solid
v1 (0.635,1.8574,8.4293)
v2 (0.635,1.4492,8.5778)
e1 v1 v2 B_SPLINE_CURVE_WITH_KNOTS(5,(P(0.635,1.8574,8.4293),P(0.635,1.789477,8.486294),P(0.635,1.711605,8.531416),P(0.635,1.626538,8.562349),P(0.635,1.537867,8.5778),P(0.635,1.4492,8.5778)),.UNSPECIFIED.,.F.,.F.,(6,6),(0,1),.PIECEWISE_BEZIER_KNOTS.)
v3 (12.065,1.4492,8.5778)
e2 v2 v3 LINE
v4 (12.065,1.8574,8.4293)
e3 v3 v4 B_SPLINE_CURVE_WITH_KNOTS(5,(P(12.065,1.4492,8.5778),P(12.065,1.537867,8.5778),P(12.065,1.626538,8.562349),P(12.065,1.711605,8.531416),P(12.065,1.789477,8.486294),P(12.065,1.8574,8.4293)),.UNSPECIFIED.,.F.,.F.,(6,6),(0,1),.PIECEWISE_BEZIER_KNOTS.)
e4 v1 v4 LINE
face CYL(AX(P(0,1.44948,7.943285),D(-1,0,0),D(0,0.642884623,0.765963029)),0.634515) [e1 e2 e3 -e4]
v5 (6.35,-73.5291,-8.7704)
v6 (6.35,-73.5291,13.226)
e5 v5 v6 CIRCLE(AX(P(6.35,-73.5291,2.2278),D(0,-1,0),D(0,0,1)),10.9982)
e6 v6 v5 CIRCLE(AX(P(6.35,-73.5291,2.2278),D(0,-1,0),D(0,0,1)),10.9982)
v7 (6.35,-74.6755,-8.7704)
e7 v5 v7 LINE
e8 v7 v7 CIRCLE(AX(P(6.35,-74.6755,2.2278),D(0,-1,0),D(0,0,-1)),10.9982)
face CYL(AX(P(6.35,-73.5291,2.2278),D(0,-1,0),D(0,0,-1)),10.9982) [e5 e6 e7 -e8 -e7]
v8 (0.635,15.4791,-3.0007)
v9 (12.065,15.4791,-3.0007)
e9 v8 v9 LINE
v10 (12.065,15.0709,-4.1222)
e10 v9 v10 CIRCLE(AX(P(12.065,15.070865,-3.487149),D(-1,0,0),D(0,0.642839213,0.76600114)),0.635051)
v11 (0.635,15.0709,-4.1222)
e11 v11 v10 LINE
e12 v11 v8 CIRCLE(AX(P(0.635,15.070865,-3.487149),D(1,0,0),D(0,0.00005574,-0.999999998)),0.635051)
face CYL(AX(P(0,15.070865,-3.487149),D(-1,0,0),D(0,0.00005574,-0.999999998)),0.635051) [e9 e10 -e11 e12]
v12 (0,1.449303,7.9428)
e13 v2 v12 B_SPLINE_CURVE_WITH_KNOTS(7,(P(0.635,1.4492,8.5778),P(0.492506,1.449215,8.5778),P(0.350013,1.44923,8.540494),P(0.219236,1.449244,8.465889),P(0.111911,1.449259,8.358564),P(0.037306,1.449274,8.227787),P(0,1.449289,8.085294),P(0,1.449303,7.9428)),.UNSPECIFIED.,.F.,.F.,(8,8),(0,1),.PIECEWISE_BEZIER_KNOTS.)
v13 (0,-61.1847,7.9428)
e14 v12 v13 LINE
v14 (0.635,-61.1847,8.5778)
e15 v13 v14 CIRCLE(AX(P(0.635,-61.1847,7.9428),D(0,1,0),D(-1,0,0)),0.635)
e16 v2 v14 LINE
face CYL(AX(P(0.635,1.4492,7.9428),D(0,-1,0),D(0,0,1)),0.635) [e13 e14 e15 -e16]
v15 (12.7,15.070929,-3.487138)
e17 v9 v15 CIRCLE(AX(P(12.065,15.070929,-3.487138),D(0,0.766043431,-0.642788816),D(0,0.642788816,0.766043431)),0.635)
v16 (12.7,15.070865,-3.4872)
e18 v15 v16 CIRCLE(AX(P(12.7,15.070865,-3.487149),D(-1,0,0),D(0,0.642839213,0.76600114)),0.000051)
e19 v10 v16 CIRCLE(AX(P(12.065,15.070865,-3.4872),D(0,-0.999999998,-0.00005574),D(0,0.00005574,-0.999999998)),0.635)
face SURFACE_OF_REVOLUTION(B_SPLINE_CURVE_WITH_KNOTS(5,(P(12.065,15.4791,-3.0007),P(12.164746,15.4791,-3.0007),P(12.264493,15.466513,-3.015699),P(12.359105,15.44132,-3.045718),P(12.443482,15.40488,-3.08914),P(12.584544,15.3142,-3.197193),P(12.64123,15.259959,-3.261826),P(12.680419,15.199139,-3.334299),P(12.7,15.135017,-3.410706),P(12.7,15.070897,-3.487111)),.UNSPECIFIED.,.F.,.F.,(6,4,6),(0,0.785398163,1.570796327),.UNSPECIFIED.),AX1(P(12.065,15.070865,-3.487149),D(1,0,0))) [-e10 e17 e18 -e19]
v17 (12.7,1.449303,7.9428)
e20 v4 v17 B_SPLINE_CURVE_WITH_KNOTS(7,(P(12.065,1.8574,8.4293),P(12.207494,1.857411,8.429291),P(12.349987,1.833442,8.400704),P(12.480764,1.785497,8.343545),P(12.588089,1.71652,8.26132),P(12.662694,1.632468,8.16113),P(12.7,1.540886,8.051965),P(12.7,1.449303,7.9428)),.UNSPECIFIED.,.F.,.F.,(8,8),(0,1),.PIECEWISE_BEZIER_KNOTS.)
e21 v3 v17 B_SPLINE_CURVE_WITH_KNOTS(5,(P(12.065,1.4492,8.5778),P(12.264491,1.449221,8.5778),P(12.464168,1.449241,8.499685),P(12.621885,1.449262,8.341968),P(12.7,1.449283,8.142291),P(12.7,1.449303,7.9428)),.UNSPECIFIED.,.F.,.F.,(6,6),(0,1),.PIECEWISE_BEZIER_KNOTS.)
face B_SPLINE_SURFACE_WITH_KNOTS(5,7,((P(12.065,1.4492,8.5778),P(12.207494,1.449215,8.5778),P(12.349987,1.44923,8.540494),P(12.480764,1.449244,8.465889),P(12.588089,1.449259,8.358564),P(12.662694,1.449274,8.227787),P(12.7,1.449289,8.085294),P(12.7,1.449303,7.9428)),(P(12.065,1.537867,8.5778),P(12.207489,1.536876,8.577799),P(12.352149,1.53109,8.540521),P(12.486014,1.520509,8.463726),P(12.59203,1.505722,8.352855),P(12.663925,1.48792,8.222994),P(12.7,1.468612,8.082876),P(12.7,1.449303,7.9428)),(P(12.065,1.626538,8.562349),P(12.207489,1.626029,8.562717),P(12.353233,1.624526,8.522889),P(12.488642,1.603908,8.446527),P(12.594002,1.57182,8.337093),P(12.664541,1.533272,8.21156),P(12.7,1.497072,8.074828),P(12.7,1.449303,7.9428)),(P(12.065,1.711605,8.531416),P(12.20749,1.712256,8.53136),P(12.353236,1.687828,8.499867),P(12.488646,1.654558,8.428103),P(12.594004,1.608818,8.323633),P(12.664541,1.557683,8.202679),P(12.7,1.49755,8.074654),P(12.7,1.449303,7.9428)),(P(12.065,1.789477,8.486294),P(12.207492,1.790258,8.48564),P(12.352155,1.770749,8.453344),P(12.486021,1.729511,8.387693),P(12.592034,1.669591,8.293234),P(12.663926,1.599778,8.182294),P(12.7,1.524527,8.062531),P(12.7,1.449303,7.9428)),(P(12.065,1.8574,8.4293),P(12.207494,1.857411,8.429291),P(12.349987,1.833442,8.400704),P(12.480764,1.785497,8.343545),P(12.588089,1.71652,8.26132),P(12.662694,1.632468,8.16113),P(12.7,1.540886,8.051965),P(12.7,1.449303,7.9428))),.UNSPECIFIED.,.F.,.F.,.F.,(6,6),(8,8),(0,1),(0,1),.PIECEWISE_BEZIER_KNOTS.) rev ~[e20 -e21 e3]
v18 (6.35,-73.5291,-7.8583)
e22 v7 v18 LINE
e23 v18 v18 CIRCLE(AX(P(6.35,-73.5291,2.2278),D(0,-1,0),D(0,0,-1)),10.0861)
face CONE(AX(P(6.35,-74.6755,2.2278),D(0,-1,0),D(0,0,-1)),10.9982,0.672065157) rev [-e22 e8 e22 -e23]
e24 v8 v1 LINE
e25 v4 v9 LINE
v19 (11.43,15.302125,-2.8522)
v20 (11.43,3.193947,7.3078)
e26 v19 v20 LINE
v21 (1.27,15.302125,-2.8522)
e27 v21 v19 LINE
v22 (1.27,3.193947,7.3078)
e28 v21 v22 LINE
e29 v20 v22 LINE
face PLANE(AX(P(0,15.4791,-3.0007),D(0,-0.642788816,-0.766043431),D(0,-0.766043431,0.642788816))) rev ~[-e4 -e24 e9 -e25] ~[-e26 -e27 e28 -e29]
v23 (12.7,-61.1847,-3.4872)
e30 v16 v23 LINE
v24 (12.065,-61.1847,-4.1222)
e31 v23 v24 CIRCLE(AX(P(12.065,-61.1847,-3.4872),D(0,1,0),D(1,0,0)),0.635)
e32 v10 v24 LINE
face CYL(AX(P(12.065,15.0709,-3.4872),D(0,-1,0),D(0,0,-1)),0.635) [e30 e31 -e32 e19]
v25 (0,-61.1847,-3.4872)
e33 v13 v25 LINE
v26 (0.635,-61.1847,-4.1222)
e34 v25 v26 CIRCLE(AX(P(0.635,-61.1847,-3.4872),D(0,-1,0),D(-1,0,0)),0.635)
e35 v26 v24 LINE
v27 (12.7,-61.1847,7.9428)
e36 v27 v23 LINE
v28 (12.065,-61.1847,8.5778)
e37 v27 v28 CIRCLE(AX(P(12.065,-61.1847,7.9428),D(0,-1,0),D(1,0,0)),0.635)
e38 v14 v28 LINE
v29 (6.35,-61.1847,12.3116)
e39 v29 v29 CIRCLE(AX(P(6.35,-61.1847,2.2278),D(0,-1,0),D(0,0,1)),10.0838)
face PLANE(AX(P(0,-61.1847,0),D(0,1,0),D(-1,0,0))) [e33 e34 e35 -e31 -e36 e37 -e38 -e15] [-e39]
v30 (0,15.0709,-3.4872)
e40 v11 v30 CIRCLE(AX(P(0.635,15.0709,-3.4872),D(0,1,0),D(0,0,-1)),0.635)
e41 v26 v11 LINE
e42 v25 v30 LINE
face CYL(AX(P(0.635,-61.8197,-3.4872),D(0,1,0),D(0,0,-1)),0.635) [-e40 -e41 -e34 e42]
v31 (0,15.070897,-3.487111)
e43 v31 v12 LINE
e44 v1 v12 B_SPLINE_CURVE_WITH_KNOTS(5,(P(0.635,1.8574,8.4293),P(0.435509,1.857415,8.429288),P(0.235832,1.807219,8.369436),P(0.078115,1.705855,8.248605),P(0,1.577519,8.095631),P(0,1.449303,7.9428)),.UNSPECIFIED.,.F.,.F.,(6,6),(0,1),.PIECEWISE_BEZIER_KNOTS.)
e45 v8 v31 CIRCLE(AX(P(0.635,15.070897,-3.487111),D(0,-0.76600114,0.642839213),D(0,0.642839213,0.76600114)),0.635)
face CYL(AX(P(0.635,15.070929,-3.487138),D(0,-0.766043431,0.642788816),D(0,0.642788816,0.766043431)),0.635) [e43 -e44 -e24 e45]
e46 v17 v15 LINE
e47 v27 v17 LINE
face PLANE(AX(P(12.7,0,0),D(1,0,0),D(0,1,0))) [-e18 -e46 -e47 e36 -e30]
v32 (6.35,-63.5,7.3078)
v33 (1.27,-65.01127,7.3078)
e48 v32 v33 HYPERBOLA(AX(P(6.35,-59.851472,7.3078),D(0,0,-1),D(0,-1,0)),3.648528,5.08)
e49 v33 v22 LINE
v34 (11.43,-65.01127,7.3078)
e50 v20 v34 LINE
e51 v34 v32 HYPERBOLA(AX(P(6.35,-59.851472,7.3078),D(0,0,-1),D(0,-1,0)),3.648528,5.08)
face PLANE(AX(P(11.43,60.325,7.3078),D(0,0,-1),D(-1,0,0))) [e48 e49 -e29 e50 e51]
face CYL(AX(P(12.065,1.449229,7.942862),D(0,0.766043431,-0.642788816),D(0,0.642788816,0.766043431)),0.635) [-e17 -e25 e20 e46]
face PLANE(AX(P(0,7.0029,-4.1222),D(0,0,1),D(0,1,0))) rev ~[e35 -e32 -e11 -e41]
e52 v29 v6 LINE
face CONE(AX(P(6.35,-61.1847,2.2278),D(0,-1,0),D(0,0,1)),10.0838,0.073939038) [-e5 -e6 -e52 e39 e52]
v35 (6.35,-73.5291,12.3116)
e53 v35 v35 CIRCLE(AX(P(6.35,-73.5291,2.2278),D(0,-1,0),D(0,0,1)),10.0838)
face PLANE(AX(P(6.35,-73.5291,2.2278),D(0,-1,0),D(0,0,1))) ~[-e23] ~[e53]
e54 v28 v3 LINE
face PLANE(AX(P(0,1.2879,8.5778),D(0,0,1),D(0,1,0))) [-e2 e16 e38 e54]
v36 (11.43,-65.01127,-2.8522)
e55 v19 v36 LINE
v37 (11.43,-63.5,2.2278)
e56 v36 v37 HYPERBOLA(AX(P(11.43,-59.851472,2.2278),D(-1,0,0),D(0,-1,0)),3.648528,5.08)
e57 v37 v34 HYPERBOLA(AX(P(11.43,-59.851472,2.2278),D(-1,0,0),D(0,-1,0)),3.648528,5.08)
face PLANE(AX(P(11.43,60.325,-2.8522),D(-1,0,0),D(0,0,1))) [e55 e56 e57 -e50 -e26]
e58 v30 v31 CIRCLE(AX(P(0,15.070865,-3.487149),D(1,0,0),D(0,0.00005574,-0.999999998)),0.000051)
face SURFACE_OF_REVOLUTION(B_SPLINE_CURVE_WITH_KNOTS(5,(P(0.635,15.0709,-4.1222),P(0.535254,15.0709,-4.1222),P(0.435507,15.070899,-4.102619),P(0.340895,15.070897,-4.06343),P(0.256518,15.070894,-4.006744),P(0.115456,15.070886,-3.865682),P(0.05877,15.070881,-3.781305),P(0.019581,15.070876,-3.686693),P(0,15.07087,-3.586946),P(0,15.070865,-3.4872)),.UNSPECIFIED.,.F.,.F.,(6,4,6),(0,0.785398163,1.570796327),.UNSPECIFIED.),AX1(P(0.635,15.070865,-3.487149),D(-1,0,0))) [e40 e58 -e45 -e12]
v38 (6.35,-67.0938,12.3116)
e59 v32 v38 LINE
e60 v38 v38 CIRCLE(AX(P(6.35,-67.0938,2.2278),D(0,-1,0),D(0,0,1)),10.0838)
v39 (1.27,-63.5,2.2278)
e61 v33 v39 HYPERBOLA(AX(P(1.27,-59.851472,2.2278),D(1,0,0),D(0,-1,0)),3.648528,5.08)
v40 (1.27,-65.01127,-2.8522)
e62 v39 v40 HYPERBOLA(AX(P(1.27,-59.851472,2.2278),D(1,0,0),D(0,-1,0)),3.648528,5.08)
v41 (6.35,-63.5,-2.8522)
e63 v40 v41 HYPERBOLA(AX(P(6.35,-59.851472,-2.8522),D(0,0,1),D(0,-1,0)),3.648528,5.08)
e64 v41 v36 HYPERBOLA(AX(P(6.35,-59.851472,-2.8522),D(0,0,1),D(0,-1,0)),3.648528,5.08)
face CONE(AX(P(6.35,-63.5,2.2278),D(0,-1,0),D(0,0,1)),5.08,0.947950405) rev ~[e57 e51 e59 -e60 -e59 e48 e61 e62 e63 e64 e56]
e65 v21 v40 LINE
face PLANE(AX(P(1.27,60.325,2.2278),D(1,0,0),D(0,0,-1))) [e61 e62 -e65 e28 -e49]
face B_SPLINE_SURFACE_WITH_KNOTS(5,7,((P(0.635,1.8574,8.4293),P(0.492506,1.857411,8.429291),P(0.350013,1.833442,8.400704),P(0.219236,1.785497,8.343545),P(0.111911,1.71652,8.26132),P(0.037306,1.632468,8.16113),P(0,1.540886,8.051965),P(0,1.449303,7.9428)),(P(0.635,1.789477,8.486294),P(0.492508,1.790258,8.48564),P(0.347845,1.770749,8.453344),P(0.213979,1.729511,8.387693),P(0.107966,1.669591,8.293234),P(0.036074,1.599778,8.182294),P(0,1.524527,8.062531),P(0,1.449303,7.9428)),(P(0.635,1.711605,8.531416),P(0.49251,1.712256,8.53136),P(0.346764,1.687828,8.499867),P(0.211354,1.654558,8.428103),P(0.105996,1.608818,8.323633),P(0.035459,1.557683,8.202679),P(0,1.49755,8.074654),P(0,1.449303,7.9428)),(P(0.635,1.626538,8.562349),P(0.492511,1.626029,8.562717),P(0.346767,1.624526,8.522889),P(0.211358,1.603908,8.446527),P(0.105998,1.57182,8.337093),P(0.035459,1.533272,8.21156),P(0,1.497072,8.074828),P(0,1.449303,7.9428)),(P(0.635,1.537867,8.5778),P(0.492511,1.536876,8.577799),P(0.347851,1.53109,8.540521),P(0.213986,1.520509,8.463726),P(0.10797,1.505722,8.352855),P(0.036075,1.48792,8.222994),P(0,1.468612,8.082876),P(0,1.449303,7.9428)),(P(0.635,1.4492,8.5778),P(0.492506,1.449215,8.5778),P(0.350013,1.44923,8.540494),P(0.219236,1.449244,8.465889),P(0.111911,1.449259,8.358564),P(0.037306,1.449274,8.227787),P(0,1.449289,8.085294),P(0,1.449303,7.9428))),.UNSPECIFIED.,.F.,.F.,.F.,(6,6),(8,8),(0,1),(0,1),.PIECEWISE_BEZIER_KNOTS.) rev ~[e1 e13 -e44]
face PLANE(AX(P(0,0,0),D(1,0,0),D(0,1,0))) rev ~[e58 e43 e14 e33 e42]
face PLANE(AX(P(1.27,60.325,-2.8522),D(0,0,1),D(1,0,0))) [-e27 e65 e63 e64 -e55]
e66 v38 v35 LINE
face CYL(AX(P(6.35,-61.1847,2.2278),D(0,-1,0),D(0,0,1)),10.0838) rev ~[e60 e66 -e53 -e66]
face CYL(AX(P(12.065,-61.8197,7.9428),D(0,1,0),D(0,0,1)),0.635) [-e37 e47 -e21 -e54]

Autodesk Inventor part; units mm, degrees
sketch "Sketch1" plane through (0, 0, 0) normal (1, 0, 0) x (0, 1, 0)
  line L0 (1.2879, 8.5778) -> (-61.8197, 8.5778)
  line L1 (-61.8197, 8.5778) -> (-61.8197, -4.1222)
  line L2 (-61.8197, -4.1222) -> (1.6803, -4.1222)
  line L3 (1.6803, -4.1222) -> (7.0029, -4.1222)
  line L4 (1.2879, 8.5778) -> (1.4492, 8.5778)
  line L5 (7.0029, -4.1222) -> (15.0709, -4.1222)
  line L6 (15.4791, -3.0007) -> (1.8574, 8.4293)
  arc A0 (1.8574, 8.4293) -> (1.4492, 8.5778) centre (1.4492, 7.9428) ccw
  arc A1 (15.0709, -4.1222) -> (15.4791, -3.0007) centre (15.0709, -3.4872) ccw
  point P0 (0, 0)
  point P1 (1.6803, 8.5778)
  point P2 (8.0303, -4.1222)
  dimension "d0" = 63.5
  dimension "d1" = 12.7
  dimension "d2" = 63.5
  dimension "d3" = 6.35
  dimension "d17" = 0.635
extrude "Extrusion1" add sketch "Sketch1" along normal blind 12.7
sketch "Sketch2" plane through (0, -61.8197, -4.1222) normal (0, -1, 0) x (1, 0, 0)
  line L0 (12.7, 12.349) -> (12.7, 12.7) projected
  line L1 (0, 12.7) -> (0, 0) projected
  line L2 (12.7, 12.7) -> (0, 12.7)
  line L3 (0, 12.7) -> (0, 0)
  line L4 (0, 0) -> (12.7, 0)
  line L5 (12.7, 0) -> (12.7, 12.7)
  line L6 (11.43, 11.43) -> (1.27, 11.43)
  line L7 (1.27, 11.43) -> (1.27, 1.27)
  line L8 (1.27, 1.27) -> (11.43, 1.27)
  line L9 (11.43, 1.27) -> (11.43, 11.43)
  point P0 (0, 4.1222)
  dimension "d7" = 1.27
extrude "Extrusion2" cut sketch "Sketch2" against normal through all contours L9 L8 L7 L6
fillet "Fillet1" radius 0.635 14 edges at (12.7, -30.1852, 8.5778) (12.7, -61.8197, 2.2278) (12.7, -23.3744, -4.1222) (12.7, 15.6676, -3.7043) (12.7, 8.6682, 2.7143) (12.7, 1.6664, 8.5395) (0, -30.1852, 8.5778) (0, -61.8197, 2.2278) (0, -23.3744, -4.1222) (0, 15.6676, -3.7043) (0, 8.6682, 2.7143) (0, 1.6664, 8.5395) (6.35, -61.8197, 8.5778) (6.35, -61.8197, -4.1222)
ref_plane "Work Plane1" through (0, -63.5, 0) normal (0, 1, 0) x (-1, 0, 0)
sketch "Sketch6" plane through (0, -63.5, 0) normal (0, 1, 0) x (-1, 0, 0)
  circle A0 centre (-6.35, 2.2278) radius 10.0838
  line L0 (-11.43, 7.3078) -> (-1.27, 7.3078) projected
  line L1 (-1.27, 7.3078) -> (-11.43, 7.3078)
  line L2 (-11.43, -2.8522) -> (-11.43, 7.3078) projected
  line L3 (-11.43, 7.3078) -> (-11.43, -2.8522)
  line L4 (-11.43, -2.8522) -> (-1.27, -2.8522)
  line L5 (-1.27, 7.3078) -> (-1.27, -2.8522) projected
  line L6 (-1.27, -2.8522) -> (-1.27, 7.3078)
  point P0 (0, 0)
  point P1 (-1.905, 6.6728)
  point P2 (-1.905, -2.2172)
  point P3 (-10.795, 6.6728)
  point P4 (-10.795, -2.2172)
  point P5 (-1.27, -2.8522)
extrude "Extrusion4" add sketch "Sketch6" along normal up to surface (2.3153 mm away)
ref_plane "Work Plane2" through (0, 0, 2.2352) normal (0, 0, 1) x (1, 0, 0)
sketch "Sketch7" plane through (0, 0, 2.2352) normal (0, 0, 1) x (1, 0, 0)
  line L0 (-3.7338, -63.5) -> (-3.7338, -61.1847) projected
  line L1 (-3.7338, -63.5) -> (-3.7338, -71.12)
  line L2 (1.27, -63.5) -> (1.27, 3.1938) projected
  line L3 (-3.7338, -71.12) -> (1.27, -63.5)
  line L4 (0.635, -61.1847) -> (12.065, -61.1847) projected
  line L5 (6.35, -61.1847) -> (6.35, -66.8359)
  line L6 (-3.7338, -63.5) -> (1.27, -63.5)
  point P0 (0, 0)
  dimension "d21" = 7.62
sketch "Sketch8" plane through (0, 0, 2.2352) normal (0, 0, 1) x (1, 0, 0)
  point P0 (0, 0)
sketch "Sketch9" plane through (0, 0, 2.2352) normal (0, 0, 1) x (1, 0, 0)
  point P0 (0, 0)
ref_plane "Work Plane3" through (0, 0, 0) normal (1, 0, 0) x (0, 1, 0)
sketch "Sketch10" plane through (0, 0, 0) normal (1, 0, 0) x (0, 1, 0)
  point P0 (0, 0)
ref_plane "Work Plane4" through (6.35, 0, 0) normal (1, 0, 0) x (0, 1, 0)
sketch "Sketch11" plane through (0, 0, 0) normal (1, 0, 0) x (0, 1, 0)
  point P0 (0, 0)
sketch "Sketch12" plane through (6.35, 0, 0) normal (1, 0, 0) x (0, 1, 0)
  line L0 (-63.5, 12.3116) -> (-61.1847, 12.3116) projected
  line L1 (-61.1847, 12.3116) -> (-73.5291, 12.3116)
  line L2 (-73.5291, 12.3116) -> (-73.5291, 13.226)
  line L3 (-63.5, -2.8522) -> (-63.5, 7.3078) projected
  line L4 (-63.5, 2.2278) -> (-67.3569, 2.2278)
  line L5 (-61.1847, 12.3116) -> (-61.1847, -7.856) projected
  line L6 (-61.1847, 12.3116) -> (-73.5291, 13.226)
  point P0 (0, 0)
  dimension "d27" = 12.3444
  dimension "d28" = 0.9144
revolve "Revolution2" add sketch "Sketch12" angle 360 about axis through (6.35, -63.5, 2.2278) along (0, -1, 0)
sketch "Sketch13" plane through (6.35, 0, 0) normal (1, 0, 0) x (0, 1, 0)
  line L0 (-63.5, 7.3078) -> (-63.5, -2.8522) projected
  line L1 (-63.5, 7.3078) -> (-67.0938, 12.3116)
  line L2 (-63.5, 12.3116) -> (-73.5291, 12.3116) projected
  line L3 (-63.5, 2.2278) -> (-65.2969, 2.2278)
  line L4 (-63.5, -7.856) -> (-63.5, 12.3116) projected
  line L5 (-63.5, 7.3078) -> (-63.5, 12.3116)
  line L6 (-63.5, 12.3116) -> (-67.0938, 12.3116)
  point P0 (0, 0)
revolve "Revolution3" add sketch "Sketch13" angle 360 about axis through (6.35, -63.5, 2.2278) along (0, -1, 0)
ref_plane "Work Plane5" through (0, 60.325, 0) normal (0, 1, 0) x (-1, 0, 0)
sketch "Sketch14" plane through (0, 60.325, 0) normal (0, 1, 0) x (-1, 0, 0)
  line L0 (-11.43, -2.8522) -> (-11.43, 7.3078) projected
  line L1 (-11.43, -2.8522) -> (-11.43, 7.3078)
  line L2 (-11.43, 7.3078) -> (-1.27, 7.3078) projected
  line L3 (-11.43, 7.3078) -> (-1.27, 7.3078)
  line L4 (-1.27, 2.2278) -> (-1.27, -2.8522) projected
  line L5 (-1.27, 7.3078) -> (-1.27, -2.8522)
  line L6 (-1.27, -2.8522) -> (-11.43, -2.8522)
  point P0 (0, 0)
extrude "Extrusion5" cut sketch "Sketch14" against normal blind 151.3166
sketch "Sketch15" plane through (6.35, 0, 0) normal (1, 0, 0) x (0, 1, 0)
  line L0 (-73.5291, -8.7704) -> (-73.5291, 13.226) projected
  line L1 (-73.5291, -8.7704) -> (-74.6755, -8.7704)
  line L2 (-74.6755, -8.7704) -> (-73.5291, -7.8583)
  line L3 (-73.5291, -8.7704) -> (-73.5291, -7.8583)
  line L4 (-73.5291, 2.2278) -> (-75.0963, 2.2278)
  point P0 (0, 0)
revolve "Revolution4" add sketch "Sketch15" angle 360 about axis through (6.35, -73.5291, 2.2278) along (0, -1, 0)
equation "\"d2\" = d0"
properties part number "nozzle"
